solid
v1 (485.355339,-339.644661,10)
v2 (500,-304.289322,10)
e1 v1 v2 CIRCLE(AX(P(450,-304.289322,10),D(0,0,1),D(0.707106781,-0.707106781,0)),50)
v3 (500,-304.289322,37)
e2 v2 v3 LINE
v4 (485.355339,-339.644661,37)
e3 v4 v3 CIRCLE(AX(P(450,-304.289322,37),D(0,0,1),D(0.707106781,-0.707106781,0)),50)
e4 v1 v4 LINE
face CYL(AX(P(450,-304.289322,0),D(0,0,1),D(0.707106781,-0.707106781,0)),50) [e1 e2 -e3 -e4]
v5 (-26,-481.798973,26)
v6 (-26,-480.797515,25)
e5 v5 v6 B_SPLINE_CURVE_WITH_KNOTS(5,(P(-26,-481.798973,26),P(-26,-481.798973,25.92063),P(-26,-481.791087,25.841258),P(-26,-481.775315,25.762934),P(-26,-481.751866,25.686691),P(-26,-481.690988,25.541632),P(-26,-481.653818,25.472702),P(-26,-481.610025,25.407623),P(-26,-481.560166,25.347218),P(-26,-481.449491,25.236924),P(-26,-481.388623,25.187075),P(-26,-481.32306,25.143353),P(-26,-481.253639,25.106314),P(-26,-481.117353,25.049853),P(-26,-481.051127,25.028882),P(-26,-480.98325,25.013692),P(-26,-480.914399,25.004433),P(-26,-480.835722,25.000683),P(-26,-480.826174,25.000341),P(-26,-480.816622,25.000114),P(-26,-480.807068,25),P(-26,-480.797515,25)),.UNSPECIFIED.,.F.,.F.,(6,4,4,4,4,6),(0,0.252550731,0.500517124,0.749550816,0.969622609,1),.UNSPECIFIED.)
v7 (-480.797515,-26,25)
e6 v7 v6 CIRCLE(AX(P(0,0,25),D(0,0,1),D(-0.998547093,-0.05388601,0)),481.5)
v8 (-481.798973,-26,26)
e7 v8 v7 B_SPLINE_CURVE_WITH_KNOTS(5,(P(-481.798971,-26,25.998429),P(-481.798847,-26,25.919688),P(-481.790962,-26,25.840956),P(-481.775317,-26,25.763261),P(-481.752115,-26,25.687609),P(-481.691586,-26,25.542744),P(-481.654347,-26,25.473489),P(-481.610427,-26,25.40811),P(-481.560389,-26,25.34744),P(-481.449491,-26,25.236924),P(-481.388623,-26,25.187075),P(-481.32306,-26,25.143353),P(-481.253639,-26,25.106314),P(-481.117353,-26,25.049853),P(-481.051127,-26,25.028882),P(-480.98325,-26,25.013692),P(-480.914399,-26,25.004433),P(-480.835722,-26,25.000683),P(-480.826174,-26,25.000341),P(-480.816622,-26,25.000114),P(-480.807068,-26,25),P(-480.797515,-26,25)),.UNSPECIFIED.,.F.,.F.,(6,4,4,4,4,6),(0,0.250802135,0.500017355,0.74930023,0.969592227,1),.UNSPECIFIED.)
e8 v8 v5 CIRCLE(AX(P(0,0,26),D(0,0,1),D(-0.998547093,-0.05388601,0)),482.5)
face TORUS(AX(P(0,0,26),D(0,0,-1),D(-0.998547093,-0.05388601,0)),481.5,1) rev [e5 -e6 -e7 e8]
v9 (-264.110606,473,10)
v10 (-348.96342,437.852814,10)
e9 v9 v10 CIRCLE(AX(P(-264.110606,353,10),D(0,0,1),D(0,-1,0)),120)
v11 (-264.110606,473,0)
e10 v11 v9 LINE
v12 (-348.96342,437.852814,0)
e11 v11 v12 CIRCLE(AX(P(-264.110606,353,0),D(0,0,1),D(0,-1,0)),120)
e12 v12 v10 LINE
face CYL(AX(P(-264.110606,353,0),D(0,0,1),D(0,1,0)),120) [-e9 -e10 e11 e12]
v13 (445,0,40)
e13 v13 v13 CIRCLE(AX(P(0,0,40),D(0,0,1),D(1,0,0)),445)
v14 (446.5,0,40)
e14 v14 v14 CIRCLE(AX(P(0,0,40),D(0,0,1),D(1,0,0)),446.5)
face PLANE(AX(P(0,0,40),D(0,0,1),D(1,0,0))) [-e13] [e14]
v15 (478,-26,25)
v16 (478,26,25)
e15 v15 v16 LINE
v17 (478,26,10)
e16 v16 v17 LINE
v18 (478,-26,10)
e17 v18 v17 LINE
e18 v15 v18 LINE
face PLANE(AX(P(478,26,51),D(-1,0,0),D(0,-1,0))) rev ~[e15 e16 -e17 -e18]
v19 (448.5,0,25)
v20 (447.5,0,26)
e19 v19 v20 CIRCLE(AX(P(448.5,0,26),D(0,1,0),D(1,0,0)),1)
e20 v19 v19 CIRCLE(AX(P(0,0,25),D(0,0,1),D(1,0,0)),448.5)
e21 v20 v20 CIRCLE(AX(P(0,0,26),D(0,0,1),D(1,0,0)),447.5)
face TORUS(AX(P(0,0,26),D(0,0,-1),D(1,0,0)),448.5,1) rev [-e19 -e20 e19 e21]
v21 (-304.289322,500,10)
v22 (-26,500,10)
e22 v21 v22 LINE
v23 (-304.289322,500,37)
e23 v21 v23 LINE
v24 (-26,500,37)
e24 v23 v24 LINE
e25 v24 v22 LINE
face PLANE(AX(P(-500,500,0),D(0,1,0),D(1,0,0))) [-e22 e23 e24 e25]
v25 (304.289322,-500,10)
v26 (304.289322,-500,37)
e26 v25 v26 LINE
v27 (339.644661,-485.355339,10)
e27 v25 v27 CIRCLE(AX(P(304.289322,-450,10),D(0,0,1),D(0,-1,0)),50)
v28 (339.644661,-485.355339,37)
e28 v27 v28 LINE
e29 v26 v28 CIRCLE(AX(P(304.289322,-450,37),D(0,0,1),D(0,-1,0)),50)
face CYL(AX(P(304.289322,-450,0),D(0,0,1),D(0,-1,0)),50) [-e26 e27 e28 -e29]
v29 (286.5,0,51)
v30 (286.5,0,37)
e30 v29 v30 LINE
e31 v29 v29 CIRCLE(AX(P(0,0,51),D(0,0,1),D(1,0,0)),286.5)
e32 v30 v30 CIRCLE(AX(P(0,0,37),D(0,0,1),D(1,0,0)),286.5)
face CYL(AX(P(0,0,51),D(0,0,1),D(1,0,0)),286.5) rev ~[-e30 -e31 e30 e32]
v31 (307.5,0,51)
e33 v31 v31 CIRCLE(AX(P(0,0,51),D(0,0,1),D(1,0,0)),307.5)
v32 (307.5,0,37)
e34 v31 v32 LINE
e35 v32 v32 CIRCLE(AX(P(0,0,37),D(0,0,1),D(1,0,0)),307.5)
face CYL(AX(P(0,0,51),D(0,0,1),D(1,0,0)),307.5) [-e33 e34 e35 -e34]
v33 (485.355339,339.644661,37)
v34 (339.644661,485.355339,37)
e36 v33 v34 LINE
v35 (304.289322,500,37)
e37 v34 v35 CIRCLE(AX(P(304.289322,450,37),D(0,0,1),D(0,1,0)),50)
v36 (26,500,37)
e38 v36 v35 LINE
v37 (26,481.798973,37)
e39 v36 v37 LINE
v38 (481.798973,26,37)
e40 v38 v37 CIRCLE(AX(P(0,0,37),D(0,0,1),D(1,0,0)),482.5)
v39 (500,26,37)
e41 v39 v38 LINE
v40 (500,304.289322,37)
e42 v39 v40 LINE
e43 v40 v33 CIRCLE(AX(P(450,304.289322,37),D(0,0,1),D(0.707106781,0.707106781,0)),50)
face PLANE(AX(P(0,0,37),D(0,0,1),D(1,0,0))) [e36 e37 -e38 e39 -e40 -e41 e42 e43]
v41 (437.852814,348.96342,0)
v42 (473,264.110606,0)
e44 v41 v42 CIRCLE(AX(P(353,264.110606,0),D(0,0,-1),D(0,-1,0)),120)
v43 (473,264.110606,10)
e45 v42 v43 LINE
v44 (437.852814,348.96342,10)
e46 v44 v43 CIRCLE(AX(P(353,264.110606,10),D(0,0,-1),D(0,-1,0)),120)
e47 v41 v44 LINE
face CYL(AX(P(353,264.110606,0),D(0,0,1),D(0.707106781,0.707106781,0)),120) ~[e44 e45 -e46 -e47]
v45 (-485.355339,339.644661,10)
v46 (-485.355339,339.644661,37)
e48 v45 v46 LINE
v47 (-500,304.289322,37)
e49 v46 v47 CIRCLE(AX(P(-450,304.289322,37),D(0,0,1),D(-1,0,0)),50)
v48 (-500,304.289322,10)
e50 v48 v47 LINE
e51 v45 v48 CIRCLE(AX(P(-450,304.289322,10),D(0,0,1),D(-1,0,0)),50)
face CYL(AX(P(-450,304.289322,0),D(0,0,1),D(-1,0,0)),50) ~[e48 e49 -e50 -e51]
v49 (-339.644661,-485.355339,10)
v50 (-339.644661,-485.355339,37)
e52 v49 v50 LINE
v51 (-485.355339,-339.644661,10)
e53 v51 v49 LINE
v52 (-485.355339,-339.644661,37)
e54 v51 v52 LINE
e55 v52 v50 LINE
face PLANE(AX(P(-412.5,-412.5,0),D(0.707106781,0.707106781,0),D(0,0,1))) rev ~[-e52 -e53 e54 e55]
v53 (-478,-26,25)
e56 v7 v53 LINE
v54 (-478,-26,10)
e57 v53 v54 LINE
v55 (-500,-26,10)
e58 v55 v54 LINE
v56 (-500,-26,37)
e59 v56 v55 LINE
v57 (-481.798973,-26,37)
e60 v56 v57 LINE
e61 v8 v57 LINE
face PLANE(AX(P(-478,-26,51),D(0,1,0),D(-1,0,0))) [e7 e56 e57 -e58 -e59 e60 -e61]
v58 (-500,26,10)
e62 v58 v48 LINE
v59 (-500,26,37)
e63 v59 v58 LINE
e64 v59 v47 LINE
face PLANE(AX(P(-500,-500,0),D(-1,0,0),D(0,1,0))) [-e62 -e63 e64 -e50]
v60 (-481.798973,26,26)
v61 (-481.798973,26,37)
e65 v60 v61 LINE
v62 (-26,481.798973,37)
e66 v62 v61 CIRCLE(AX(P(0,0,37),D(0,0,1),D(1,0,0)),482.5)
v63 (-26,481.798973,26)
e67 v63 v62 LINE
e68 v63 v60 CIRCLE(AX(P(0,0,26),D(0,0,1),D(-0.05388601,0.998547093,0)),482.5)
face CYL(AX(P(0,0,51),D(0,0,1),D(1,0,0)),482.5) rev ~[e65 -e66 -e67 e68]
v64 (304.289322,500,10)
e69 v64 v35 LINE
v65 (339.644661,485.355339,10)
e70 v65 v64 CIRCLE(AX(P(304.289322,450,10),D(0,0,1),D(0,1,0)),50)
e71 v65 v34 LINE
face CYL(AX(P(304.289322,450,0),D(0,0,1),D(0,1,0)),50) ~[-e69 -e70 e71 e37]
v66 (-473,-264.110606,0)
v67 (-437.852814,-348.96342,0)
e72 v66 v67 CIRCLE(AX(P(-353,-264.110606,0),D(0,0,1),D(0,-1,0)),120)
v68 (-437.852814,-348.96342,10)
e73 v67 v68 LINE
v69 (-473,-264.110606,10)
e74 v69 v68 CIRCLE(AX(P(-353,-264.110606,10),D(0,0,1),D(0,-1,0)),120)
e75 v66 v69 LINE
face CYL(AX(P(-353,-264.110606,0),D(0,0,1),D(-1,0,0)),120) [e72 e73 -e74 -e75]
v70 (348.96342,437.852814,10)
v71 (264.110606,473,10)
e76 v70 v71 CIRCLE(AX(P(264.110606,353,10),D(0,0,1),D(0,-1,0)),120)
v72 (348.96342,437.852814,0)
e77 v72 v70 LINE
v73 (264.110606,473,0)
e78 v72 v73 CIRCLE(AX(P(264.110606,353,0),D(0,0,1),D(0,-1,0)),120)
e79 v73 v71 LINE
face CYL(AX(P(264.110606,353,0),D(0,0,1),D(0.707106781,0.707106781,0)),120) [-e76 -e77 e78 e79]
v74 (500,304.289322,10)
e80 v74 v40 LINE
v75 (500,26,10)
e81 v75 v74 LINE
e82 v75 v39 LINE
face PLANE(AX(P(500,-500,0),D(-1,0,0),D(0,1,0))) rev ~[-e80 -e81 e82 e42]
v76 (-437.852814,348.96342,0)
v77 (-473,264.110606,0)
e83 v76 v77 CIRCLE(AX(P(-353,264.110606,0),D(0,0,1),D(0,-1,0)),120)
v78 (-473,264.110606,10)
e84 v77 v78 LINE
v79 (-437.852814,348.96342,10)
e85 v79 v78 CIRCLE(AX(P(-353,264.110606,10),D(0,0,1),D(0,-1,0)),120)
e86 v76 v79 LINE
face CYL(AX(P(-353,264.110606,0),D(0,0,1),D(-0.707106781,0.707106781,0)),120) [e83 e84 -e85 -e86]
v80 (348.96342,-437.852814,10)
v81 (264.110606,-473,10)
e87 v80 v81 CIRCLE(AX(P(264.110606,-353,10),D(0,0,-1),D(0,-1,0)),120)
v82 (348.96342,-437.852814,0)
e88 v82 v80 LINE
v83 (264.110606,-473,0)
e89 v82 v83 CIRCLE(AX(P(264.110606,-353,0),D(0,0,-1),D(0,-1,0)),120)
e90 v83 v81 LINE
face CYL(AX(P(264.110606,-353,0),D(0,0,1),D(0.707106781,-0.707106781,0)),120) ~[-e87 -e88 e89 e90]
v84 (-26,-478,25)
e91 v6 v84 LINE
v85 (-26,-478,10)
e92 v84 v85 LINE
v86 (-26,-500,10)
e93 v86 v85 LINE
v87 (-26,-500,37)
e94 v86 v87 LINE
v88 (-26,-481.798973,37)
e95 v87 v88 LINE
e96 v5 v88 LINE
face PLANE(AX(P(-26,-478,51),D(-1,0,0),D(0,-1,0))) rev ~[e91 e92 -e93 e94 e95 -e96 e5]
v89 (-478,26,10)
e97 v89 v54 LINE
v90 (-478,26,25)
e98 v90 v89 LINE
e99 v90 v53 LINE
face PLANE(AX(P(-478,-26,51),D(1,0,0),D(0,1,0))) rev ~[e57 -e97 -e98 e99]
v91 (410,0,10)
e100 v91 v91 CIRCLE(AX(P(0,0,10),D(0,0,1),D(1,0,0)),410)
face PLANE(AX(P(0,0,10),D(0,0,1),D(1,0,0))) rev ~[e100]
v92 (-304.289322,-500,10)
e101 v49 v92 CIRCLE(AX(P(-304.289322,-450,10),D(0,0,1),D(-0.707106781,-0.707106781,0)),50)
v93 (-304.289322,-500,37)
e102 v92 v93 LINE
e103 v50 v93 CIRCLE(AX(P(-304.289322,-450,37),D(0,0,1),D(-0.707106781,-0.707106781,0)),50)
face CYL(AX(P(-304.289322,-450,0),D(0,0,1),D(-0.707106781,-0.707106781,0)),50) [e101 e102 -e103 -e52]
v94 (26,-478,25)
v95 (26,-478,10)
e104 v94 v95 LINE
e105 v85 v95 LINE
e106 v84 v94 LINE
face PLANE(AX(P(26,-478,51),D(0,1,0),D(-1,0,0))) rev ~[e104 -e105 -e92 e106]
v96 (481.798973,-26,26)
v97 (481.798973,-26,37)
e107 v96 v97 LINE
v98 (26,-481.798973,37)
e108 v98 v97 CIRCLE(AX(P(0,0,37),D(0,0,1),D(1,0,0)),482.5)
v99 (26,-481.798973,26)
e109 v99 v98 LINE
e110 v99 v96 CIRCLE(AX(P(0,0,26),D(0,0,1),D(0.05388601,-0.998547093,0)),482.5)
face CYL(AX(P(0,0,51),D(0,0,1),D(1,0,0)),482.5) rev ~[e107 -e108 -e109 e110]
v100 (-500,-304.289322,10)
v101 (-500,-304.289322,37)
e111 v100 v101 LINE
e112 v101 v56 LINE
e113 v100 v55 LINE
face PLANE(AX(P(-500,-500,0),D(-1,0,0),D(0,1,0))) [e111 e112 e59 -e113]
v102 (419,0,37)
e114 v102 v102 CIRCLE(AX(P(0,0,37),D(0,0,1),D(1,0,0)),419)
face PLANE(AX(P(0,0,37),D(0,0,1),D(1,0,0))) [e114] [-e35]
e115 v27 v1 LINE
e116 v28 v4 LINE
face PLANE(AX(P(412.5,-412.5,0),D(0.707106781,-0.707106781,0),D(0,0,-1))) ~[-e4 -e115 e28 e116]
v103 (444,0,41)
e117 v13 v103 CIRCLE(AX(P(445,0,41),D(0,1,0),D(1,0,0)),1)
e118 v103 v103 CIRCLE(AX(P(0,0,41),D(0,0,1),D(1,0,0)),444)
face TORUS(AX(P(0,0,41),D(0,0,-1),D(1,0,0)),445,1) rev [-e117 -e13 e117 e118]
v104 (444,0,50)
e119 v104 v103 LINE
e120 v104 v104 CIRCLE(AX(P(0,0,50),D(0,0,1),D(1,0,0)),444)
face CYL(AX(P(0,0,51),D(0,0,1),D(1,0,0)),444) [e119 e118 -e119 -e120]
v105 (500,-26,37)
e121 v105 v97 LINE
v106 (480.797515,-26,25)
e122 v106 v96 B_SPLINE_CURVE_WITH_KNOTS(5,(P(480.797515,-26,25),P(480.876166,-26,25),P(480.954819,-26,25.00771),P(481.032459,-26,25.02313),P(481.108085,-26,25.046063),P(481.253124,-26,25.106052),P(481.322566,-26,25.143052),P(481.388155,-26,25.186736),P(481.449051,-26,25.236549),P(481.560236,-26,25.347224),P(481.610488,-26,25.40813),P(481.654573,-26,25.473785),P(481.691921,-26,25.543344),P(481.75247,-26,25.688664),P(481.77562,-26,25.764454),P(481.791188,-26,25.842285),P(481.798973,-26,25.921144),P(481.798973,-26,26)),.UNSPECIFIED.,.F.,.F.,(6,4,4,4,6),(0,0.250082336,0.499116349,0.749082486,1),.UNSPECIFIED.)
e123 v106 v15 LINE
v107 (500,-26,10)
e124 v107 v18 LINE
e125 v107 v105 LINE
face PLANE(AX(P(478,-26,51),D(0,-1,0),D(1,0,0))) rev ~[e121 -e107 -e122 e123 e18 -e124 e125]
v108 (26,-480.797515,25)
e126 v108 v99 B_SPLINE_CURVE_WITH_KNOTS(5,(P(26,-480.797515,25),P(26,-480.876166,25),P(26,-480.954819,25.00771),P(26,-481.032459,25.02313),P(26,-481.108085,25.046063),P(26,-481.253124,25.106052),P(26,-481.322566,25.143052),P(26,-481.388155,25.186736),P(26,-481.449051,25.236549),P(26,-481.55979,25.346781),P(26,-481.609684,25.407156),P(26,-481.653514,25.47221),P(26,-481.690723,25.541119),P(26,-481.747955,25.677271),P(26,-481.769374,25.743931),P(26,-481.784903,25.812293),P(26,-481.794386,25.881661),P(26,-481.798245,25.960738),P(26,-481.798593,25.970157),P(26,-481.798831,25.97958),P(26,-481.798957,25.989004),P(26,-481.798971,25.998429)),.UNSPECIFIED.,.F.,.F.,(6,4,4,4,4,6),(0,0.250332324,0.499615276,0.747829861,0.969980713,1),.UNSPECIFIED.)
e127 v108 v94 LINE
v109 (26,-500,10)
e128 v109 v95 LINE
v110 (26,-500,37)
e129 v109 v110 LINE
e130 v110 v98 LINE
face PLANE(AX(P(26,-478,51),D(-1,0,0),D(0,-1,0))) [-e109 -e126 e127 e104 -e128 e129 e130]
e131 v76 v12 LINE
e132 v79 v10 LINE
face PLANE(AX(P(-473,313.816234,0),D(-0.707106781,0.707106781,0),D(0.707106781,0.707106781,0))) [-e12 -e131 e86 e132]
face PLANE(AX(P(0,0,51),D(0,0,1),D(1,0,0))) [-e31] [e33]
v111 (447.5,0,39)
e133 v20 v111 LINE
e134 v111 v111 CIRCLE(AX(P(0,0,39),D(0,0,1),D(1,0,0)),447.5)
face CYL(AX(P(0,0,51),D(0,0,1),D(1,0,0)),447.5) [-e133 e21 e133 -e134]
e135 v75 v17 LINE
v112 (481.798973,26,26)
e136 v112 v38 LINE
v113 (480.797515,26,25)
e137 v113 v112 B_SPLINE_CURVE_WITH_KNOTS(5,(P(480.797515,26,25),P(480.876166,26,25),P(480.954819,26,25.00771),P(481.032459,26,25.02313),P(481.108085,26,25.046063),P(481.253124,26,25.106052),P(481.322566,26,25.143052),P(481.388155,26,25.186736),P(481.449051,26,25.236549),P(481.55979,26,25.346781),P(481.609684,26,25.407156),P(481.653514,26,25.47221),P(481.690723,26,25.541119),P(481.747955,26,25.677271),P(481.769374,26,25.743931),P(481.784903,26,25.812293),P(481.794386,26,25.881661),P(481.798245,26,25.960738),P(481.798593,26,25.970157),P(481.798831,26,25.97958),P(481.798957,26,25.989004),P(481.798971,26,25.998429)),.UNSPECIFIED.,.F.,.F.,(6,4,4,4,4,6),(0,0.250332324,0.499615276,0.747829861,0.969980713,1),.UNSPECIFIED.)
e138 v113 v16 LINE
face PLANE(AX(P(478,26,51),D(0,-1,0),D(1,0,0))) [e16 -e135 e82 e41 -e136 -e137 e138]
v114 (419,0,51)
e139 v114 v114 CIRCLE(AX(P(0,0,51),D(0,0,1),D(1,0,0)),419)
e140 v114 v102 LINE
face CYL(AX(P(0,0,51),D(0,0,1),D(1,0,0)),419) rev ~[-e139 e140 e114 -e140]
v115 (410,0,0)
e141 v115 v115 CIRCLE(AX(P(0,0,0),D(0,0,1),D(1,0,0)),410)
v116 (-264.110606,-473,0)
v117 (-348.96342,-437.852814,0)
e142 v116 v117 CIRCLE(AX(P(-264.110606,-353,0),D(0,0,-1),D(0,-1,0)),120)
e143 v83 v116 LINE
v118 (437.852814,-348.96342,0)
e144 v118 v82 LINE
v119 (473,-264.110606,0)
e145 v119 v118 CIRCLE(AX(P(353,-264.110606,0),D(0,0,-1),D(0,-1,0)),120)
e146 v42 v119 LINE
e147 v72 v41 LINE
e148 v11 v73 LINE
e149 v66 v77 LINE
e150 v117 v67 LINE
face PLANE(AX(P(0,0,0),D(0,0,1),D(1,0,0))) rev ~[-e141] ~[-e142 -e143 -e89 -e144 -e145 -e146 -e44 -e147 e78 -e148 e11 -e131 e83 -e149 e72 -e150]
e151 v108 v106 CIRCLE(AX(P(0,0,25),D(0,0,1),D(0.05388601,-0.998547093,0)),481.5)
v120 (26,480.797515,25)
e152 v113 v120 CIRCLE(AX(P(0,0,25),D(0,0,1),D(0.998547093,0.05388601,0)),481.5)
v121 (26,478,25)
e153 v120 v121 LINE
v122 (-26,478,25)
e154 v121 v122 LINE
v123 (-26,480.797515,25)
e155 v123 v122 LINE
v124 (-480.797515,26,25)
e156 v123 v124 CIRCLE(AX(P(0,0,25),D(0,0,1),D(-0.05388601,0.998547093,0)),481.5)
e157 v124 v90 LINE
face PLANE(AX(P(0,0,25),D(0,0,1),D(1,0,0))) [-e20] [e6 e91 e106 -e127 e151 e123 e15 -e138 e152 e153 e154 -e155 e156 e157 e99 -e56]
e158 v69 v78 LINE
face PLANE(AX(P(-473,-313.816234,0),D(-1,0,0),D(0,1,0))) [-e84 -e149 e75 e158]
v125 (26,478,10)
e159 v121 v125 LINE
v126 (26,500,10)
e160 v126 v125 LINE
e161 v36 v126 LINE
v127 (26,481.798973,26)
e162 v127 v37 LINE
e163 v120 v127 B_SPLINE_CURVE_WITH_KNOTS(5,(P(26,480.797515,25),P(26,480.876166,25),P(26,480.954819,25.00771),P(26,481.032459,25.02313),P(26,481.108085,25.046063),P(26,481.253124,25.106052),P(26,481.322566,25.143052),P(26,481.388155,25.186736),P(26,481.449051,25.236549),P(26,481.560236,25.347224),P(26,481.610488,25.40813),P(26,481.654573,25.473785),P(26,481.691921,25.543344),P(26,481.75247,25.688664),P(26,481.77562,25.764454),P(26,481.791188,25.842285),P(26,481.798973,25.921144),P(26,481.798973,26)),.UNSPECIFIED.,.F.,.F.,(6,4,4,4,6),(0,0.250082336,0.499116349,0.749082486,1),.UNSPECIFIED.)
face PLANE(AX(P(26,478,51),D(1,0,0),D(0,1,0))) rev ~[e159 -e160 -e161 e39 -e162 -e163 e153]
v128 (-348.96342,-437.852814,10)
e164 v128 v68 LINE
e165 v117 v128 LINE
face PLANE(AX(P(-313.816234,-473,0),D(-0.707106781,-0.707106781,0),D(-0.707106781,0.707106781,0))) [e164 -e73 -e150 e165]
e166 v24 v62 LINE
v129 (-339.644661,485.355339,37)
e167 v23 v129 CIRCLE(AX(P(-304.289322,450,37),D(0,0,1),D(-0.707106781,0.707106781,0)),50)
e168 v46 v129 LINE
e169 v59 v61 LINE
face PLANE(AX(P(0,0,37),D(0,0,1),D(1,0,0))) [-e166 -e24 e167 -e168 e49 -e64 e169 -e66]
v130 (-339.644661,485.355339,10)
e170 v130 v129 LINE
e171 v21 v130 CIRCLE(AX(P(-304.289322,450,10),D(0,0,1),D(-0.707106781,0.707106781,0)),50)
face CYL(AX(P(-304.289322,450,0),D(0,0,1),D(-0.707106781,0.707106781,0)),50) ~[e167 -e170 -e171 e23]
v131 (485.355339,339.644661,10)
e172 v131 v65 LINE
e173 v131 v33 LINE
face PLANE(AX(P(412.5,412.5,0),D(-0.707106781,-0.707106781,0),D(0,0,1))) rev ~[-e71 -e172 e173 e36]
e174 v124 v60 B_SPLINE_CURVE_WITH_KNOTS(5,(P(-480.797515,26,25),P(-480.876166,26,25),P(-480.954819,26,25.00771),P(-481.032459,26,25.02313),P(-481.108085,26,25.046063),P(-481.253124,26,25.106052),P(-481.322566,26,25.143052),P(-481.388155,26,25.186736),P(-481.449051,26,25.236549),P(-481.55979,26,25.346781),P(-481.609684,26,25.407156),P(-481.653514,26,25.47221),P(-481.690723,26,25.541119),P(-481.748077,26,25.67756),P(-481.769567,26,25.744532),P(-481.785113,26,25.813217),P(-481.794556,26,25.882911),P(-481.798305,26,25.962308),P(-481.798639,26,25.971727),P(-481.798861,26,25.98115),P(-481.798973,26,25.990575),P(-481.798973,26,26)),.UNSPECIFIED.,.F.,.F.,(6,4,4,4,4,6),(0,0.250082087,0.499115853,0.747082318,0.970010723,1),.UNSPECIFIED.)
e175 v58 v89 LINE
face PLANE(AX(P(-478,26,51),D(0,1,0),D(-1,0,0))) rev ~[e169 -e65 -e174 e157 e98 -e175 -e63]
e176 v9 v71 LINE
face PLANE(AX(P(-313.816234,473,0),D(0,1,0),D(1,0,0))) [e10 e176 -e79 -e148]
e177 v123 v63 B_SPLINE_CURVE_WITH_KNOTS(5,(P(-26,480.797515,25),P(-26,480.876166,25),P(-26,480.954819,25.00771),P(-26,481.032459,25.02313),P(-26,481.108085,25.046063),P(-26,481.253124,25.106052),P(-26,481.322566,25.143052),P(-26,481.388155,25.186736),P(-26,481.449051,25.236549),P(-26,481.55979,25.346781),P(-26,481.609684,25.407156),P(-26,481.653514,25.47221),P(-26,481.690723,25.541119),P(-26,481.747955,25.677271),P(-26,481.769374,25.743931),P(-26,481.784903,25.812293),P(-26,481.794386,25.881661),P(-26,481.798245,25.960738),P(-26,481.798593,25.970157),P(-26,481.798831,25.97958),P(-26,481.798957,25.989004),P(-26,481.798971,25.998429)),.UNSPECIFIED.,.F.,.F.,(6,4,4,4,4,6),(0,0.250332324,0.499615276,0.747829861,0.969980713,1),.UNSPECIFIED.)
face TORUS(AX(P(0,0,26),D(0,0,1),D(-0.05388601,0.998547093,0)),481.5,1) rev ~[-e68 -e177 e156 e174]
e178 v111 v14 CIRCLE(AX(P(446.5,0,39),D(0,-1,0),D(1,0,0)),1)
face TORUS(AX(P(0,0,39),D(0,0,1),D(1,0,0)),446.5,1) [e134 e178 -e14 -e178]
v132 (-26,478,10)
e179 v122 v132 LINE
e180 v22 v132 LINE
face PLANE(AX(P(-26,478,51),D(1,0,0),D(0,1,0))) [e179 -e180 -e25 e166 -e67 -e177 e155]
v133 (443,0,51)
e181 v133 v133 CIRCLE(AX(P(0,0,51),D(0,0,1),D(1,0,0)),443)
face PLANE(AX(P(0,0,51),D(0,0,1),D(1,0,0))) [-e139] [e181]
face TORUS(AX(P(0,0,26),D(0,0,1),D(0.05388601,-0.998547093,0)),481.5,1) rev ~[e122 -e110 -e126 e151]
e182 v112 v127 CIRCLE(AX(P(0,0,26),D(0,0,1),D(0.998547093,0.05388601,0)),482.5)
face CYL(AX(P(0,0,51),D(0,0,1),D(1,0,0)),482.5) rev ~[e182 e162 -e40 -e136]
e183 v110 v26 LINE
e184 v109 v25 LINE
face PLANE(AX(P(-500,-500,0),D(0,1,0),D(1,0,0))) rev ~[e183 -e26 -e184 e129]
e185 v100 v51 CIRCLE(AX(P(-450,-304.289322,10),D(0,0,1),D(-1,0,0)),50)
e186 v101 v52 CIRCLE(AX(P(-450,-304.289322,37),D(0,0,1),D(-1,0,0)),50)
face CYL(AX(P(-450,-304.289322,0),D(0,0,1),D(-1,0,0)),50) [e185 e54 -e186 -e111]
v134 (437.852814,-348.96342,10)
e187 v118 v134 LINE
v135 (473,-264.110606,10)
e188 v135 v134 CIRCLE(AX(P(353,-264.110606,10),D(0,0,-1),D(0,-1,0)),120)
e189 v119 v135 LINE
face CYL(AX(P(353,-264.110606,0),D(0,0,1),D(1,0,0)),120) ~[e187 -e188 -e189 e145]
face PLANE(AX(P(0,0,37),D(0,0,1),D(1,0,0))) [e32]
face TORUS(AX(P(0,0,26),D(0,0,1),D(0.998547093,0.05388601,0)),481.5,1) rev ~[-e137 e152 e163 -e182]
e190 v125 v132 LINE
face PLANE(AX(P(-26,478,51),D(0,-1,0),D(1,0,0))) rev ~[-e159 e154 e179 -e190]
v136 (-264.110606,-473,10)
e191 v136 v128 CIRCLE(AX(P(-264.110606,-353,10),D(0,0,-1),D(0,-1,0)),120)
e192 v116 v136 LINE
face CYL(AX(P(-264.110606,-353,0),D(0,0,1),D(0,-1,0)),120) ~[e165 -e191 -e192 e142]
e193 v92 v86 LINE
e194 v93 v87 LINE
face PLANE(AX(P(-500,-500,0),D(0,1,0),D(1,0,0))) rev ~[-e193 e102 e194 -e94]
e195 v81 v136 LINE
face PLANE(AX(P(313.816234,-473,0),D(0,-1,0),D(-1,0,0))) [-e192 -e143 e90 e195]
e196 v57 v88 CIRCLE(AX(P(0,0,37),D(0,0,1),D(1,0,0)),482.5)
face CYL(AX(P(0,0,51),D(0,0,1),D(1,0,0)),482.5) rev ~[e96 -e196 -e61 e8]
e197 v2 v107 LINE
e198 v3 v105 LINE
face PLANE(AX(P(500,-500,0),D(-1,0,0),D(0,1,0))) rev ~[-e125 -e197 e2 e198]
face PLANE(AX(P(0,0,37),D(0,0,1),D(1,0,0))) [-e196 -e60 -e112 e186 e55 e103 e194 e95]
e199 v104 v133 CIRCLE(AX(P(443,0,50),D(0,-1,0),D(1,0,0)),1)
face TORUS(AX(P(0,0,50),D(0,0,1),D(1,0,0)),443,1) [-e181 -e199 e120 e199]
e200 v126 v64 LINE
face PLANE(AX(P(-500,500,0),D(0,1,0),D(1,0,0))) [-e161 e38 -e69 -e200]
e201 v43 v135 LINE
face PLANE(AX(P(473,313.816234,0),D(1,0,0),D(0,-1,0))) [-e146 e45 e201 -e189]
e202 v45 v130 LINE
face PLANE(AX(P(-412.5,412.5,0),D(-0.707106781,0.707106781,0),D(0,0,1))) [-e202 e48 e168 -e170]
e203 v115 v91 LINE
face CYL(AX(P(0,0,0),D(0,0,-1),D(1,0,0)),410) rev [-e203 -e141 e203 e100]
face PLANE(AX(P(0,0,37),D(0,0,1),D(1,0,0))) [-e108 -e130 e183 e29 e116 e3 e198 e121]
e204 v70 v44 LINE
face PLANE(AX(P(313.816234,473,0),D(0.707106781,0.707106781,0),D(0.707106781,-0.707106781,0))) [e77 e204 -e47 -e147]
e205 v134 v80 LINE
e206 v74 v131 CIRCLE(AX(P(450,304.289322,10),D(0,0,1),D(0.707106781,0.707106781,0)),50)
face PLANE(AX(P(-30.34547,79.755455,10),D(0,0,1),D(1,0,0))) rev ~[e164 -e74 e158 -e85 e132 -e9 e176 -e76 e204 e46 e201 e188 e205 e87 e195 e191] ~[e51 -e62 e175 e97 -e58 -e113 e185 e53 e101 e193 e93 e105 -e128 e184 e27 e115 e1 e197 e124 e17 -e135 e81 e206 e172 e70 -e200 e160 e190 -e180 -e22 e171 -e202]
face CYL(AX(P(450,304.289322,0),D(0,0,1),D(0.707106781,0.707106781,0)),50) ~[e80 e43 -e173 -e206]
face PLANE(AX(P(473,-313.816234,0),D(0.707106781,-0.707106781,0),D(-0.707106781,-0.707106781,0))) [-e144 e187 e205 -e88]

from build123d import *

# Parameters (mm, degrees)
F0_W            = 1000
F0_H            = 1000
F1_DEPTH        = 51
F2_SIZE         = 175
F3_R            = 50
F5_W            = 52
F5_H            = 100
F6_DEPTH        = 100
F6_COPIES_COUNT = 4
F7_R            = 410
F8_DEPTH        = 10
F9_W            = 1332.0814967155
F9_H            = 1389.9142146111
F10_DEPTH       = 10
F11_R           = 120
F12_R           = 700
F12_R_2         = 444
F13_DEPTH       = 11
F14_R           = 700
F14_R_2         = 447.5
F15_DEPTH       = 14
F16_R           = 482.5
F16_R_2         = 447.5
F17_DEPTH       = 26
F18_R           = 1
F19_R           = 419
F19_R_2         = 307.5
F20_DEPTH       = 14
F21_R           = 286.5
F22_DEPTH       = 14


# Not quite as in the source:
# - a pattern or mirror of a feature is missing from the dataset's text; its kind, count and spacing are read off the source's solid


with BuildPart() as f1:
    # F0 (on Top) → F1 (new body)
    with BuildSketch(Plane.XY):
        Rectangle(F0_W, F0_H)
    extrude(amount=F1_DEPTH)

    # F2
    f2_edges = [f1.edges().sort_by_distance(p)[0] for p in [
        (-500, -500, 25.5),
        (500, -500, 25.5),
        (500, 500, 25.5),
        (-500, 500, 25.5),
    ]]
    chamfer(f2_edges, length=F2_SIZE)

    # F3
    f3_edges = [f1.edges().sort_by_distance(p)[0] for p in [
        (-500, -325, 25.5),
        (-325, -500, 25.5),
        (325, -500, 25.5),
        (500, -325, 25.5),
        (-500, 325, 25.5),
        (500, 325, 25.5),
        (325, 500, 25.5),
        (-325, 500, 25.5),
    ]]
    fillet(f3_edges, radius=F3_R)

    # F5 (on face) → F6 (cut)
    with BuildSketch(Plane.XY.offset(51)):
        with Locations((0, 528)):
            Rectangle(F5_W, F5_H)
    f6 = extrude(amount=-F6_DEPTH, mode=Mode.SUBTRACT)

    # F6_copies: F6 ×4 about axis
    f6_copies_axis = Axis((0, 0, 0), (0, 0, 1))
    for i in range(1, F6_COPIES_COUNT):
        add(f6.rotate(f6_copies_axis, i * 360 / F6_COPIES_COUNT), mode=Mode.SUBTRACT)

    # F7 (on Top) → F8 (cut)
    with BuildSketch(Plane.XY):
        Circle(F7_R)
    extrude(amount=F8_DEPTH, mode=Mode.SUBTRACT)

    # F9 (on Top) → F10 (cut)
    with BuildSketch(Plane.XY):
        with Locations((-30.3454697132, 79.7554552555)):
            Rectangle(F9_W, F9_H)
        Polygon((473, 313.8162338159), (473, -313.8162338159), (313.8162338159, -473), (-313.8162338159, -473), (-473, -313.8162338159), (-473, 313.8162338159), (-313.8162338159, 473), (313.8162338159, 473), align=None, mode=Mode.SUBTRACT)
    extrude(amount=F10_DEPTH, mode=Mode.SUBTRACT)

    # F11
    f11_edges = [f1.edges().sort_by_distance(p)[0] for p in [
        (-313.816234, -473, 5),
        (-473, -313.816234, 5),
        (-473, 313.816234, 5),
        (-313.816234, 473, 5),
        (473, -313.816234, 5),
        (313.816234, -473, 5),
        (313.816234, 473, 5),
        (473, 313.816234, 5),
    ]]
    fillet(f11_edges, radius=F11_R)

    # F12 (on face) → F13 (cut)
    with BuildSketch(Plane.XY.offset(51)):
        Circle(F12_R)
        Circle(F12_R_2, mode=Mode.SUBTRACT)
    extrude(amount=-F13_DEPTH, mode=Mode.SUBTRACT)

    # F14 (on face) → F15 (cut)
    with BuildSketch(Plane.XY.offset(51)):
        Circle(F14_R)
        Circle(F14_R_2, mode=Mode.SUBTRACT)
    extrude(amount=-F15_DEPTH, mode=Mode.SUBTRACT)

    # F16 (on face) → F17 (cut)
    with BuildSketch(Plane.XY.offset(51)):
        Circle(F16_R)
        Circle(F16_R_2, mode=Mode.SUBTRACT)
    extrude(amount=-F17_DEPTH, mode=Mode.SUBTRACT)

    # F18
    f18_edges = [f1.edges().sort_by_distance(p)[0] for p in [
        (-341.179022, 341.179022, 25),
        (341.179022, 341.179022, 25),
        (341.179022, -341.179022, 25),
        (-341.179022, -341.179022, 25),
        (-447.5, 0, 25),
        (-444, 0, 40),
        (-447.5, 0, 40),
        (-444, 0, 51),
    ]]
    fillet(f18_edges, radius=F18_R)

    # F19 (on face) → F20 (cut)
    with BuildSketch(Plane.XY.offset(51)):
        Circle(F19_R)
        Circle(F19_R_2, mode=Mode.SUBTRACT)
    extrude(amount=-F20_DEPTH, mode=Mode.SUBTRACT)

    # F21 (on face) → F22 (cut)
    with BuildSketch(Plane.XY.offset(51)):
        Circle(F21_R)
    extrude(amount=-F22_DEPTH, mode=Mode.SUBTRACT)


solid = f1.part
